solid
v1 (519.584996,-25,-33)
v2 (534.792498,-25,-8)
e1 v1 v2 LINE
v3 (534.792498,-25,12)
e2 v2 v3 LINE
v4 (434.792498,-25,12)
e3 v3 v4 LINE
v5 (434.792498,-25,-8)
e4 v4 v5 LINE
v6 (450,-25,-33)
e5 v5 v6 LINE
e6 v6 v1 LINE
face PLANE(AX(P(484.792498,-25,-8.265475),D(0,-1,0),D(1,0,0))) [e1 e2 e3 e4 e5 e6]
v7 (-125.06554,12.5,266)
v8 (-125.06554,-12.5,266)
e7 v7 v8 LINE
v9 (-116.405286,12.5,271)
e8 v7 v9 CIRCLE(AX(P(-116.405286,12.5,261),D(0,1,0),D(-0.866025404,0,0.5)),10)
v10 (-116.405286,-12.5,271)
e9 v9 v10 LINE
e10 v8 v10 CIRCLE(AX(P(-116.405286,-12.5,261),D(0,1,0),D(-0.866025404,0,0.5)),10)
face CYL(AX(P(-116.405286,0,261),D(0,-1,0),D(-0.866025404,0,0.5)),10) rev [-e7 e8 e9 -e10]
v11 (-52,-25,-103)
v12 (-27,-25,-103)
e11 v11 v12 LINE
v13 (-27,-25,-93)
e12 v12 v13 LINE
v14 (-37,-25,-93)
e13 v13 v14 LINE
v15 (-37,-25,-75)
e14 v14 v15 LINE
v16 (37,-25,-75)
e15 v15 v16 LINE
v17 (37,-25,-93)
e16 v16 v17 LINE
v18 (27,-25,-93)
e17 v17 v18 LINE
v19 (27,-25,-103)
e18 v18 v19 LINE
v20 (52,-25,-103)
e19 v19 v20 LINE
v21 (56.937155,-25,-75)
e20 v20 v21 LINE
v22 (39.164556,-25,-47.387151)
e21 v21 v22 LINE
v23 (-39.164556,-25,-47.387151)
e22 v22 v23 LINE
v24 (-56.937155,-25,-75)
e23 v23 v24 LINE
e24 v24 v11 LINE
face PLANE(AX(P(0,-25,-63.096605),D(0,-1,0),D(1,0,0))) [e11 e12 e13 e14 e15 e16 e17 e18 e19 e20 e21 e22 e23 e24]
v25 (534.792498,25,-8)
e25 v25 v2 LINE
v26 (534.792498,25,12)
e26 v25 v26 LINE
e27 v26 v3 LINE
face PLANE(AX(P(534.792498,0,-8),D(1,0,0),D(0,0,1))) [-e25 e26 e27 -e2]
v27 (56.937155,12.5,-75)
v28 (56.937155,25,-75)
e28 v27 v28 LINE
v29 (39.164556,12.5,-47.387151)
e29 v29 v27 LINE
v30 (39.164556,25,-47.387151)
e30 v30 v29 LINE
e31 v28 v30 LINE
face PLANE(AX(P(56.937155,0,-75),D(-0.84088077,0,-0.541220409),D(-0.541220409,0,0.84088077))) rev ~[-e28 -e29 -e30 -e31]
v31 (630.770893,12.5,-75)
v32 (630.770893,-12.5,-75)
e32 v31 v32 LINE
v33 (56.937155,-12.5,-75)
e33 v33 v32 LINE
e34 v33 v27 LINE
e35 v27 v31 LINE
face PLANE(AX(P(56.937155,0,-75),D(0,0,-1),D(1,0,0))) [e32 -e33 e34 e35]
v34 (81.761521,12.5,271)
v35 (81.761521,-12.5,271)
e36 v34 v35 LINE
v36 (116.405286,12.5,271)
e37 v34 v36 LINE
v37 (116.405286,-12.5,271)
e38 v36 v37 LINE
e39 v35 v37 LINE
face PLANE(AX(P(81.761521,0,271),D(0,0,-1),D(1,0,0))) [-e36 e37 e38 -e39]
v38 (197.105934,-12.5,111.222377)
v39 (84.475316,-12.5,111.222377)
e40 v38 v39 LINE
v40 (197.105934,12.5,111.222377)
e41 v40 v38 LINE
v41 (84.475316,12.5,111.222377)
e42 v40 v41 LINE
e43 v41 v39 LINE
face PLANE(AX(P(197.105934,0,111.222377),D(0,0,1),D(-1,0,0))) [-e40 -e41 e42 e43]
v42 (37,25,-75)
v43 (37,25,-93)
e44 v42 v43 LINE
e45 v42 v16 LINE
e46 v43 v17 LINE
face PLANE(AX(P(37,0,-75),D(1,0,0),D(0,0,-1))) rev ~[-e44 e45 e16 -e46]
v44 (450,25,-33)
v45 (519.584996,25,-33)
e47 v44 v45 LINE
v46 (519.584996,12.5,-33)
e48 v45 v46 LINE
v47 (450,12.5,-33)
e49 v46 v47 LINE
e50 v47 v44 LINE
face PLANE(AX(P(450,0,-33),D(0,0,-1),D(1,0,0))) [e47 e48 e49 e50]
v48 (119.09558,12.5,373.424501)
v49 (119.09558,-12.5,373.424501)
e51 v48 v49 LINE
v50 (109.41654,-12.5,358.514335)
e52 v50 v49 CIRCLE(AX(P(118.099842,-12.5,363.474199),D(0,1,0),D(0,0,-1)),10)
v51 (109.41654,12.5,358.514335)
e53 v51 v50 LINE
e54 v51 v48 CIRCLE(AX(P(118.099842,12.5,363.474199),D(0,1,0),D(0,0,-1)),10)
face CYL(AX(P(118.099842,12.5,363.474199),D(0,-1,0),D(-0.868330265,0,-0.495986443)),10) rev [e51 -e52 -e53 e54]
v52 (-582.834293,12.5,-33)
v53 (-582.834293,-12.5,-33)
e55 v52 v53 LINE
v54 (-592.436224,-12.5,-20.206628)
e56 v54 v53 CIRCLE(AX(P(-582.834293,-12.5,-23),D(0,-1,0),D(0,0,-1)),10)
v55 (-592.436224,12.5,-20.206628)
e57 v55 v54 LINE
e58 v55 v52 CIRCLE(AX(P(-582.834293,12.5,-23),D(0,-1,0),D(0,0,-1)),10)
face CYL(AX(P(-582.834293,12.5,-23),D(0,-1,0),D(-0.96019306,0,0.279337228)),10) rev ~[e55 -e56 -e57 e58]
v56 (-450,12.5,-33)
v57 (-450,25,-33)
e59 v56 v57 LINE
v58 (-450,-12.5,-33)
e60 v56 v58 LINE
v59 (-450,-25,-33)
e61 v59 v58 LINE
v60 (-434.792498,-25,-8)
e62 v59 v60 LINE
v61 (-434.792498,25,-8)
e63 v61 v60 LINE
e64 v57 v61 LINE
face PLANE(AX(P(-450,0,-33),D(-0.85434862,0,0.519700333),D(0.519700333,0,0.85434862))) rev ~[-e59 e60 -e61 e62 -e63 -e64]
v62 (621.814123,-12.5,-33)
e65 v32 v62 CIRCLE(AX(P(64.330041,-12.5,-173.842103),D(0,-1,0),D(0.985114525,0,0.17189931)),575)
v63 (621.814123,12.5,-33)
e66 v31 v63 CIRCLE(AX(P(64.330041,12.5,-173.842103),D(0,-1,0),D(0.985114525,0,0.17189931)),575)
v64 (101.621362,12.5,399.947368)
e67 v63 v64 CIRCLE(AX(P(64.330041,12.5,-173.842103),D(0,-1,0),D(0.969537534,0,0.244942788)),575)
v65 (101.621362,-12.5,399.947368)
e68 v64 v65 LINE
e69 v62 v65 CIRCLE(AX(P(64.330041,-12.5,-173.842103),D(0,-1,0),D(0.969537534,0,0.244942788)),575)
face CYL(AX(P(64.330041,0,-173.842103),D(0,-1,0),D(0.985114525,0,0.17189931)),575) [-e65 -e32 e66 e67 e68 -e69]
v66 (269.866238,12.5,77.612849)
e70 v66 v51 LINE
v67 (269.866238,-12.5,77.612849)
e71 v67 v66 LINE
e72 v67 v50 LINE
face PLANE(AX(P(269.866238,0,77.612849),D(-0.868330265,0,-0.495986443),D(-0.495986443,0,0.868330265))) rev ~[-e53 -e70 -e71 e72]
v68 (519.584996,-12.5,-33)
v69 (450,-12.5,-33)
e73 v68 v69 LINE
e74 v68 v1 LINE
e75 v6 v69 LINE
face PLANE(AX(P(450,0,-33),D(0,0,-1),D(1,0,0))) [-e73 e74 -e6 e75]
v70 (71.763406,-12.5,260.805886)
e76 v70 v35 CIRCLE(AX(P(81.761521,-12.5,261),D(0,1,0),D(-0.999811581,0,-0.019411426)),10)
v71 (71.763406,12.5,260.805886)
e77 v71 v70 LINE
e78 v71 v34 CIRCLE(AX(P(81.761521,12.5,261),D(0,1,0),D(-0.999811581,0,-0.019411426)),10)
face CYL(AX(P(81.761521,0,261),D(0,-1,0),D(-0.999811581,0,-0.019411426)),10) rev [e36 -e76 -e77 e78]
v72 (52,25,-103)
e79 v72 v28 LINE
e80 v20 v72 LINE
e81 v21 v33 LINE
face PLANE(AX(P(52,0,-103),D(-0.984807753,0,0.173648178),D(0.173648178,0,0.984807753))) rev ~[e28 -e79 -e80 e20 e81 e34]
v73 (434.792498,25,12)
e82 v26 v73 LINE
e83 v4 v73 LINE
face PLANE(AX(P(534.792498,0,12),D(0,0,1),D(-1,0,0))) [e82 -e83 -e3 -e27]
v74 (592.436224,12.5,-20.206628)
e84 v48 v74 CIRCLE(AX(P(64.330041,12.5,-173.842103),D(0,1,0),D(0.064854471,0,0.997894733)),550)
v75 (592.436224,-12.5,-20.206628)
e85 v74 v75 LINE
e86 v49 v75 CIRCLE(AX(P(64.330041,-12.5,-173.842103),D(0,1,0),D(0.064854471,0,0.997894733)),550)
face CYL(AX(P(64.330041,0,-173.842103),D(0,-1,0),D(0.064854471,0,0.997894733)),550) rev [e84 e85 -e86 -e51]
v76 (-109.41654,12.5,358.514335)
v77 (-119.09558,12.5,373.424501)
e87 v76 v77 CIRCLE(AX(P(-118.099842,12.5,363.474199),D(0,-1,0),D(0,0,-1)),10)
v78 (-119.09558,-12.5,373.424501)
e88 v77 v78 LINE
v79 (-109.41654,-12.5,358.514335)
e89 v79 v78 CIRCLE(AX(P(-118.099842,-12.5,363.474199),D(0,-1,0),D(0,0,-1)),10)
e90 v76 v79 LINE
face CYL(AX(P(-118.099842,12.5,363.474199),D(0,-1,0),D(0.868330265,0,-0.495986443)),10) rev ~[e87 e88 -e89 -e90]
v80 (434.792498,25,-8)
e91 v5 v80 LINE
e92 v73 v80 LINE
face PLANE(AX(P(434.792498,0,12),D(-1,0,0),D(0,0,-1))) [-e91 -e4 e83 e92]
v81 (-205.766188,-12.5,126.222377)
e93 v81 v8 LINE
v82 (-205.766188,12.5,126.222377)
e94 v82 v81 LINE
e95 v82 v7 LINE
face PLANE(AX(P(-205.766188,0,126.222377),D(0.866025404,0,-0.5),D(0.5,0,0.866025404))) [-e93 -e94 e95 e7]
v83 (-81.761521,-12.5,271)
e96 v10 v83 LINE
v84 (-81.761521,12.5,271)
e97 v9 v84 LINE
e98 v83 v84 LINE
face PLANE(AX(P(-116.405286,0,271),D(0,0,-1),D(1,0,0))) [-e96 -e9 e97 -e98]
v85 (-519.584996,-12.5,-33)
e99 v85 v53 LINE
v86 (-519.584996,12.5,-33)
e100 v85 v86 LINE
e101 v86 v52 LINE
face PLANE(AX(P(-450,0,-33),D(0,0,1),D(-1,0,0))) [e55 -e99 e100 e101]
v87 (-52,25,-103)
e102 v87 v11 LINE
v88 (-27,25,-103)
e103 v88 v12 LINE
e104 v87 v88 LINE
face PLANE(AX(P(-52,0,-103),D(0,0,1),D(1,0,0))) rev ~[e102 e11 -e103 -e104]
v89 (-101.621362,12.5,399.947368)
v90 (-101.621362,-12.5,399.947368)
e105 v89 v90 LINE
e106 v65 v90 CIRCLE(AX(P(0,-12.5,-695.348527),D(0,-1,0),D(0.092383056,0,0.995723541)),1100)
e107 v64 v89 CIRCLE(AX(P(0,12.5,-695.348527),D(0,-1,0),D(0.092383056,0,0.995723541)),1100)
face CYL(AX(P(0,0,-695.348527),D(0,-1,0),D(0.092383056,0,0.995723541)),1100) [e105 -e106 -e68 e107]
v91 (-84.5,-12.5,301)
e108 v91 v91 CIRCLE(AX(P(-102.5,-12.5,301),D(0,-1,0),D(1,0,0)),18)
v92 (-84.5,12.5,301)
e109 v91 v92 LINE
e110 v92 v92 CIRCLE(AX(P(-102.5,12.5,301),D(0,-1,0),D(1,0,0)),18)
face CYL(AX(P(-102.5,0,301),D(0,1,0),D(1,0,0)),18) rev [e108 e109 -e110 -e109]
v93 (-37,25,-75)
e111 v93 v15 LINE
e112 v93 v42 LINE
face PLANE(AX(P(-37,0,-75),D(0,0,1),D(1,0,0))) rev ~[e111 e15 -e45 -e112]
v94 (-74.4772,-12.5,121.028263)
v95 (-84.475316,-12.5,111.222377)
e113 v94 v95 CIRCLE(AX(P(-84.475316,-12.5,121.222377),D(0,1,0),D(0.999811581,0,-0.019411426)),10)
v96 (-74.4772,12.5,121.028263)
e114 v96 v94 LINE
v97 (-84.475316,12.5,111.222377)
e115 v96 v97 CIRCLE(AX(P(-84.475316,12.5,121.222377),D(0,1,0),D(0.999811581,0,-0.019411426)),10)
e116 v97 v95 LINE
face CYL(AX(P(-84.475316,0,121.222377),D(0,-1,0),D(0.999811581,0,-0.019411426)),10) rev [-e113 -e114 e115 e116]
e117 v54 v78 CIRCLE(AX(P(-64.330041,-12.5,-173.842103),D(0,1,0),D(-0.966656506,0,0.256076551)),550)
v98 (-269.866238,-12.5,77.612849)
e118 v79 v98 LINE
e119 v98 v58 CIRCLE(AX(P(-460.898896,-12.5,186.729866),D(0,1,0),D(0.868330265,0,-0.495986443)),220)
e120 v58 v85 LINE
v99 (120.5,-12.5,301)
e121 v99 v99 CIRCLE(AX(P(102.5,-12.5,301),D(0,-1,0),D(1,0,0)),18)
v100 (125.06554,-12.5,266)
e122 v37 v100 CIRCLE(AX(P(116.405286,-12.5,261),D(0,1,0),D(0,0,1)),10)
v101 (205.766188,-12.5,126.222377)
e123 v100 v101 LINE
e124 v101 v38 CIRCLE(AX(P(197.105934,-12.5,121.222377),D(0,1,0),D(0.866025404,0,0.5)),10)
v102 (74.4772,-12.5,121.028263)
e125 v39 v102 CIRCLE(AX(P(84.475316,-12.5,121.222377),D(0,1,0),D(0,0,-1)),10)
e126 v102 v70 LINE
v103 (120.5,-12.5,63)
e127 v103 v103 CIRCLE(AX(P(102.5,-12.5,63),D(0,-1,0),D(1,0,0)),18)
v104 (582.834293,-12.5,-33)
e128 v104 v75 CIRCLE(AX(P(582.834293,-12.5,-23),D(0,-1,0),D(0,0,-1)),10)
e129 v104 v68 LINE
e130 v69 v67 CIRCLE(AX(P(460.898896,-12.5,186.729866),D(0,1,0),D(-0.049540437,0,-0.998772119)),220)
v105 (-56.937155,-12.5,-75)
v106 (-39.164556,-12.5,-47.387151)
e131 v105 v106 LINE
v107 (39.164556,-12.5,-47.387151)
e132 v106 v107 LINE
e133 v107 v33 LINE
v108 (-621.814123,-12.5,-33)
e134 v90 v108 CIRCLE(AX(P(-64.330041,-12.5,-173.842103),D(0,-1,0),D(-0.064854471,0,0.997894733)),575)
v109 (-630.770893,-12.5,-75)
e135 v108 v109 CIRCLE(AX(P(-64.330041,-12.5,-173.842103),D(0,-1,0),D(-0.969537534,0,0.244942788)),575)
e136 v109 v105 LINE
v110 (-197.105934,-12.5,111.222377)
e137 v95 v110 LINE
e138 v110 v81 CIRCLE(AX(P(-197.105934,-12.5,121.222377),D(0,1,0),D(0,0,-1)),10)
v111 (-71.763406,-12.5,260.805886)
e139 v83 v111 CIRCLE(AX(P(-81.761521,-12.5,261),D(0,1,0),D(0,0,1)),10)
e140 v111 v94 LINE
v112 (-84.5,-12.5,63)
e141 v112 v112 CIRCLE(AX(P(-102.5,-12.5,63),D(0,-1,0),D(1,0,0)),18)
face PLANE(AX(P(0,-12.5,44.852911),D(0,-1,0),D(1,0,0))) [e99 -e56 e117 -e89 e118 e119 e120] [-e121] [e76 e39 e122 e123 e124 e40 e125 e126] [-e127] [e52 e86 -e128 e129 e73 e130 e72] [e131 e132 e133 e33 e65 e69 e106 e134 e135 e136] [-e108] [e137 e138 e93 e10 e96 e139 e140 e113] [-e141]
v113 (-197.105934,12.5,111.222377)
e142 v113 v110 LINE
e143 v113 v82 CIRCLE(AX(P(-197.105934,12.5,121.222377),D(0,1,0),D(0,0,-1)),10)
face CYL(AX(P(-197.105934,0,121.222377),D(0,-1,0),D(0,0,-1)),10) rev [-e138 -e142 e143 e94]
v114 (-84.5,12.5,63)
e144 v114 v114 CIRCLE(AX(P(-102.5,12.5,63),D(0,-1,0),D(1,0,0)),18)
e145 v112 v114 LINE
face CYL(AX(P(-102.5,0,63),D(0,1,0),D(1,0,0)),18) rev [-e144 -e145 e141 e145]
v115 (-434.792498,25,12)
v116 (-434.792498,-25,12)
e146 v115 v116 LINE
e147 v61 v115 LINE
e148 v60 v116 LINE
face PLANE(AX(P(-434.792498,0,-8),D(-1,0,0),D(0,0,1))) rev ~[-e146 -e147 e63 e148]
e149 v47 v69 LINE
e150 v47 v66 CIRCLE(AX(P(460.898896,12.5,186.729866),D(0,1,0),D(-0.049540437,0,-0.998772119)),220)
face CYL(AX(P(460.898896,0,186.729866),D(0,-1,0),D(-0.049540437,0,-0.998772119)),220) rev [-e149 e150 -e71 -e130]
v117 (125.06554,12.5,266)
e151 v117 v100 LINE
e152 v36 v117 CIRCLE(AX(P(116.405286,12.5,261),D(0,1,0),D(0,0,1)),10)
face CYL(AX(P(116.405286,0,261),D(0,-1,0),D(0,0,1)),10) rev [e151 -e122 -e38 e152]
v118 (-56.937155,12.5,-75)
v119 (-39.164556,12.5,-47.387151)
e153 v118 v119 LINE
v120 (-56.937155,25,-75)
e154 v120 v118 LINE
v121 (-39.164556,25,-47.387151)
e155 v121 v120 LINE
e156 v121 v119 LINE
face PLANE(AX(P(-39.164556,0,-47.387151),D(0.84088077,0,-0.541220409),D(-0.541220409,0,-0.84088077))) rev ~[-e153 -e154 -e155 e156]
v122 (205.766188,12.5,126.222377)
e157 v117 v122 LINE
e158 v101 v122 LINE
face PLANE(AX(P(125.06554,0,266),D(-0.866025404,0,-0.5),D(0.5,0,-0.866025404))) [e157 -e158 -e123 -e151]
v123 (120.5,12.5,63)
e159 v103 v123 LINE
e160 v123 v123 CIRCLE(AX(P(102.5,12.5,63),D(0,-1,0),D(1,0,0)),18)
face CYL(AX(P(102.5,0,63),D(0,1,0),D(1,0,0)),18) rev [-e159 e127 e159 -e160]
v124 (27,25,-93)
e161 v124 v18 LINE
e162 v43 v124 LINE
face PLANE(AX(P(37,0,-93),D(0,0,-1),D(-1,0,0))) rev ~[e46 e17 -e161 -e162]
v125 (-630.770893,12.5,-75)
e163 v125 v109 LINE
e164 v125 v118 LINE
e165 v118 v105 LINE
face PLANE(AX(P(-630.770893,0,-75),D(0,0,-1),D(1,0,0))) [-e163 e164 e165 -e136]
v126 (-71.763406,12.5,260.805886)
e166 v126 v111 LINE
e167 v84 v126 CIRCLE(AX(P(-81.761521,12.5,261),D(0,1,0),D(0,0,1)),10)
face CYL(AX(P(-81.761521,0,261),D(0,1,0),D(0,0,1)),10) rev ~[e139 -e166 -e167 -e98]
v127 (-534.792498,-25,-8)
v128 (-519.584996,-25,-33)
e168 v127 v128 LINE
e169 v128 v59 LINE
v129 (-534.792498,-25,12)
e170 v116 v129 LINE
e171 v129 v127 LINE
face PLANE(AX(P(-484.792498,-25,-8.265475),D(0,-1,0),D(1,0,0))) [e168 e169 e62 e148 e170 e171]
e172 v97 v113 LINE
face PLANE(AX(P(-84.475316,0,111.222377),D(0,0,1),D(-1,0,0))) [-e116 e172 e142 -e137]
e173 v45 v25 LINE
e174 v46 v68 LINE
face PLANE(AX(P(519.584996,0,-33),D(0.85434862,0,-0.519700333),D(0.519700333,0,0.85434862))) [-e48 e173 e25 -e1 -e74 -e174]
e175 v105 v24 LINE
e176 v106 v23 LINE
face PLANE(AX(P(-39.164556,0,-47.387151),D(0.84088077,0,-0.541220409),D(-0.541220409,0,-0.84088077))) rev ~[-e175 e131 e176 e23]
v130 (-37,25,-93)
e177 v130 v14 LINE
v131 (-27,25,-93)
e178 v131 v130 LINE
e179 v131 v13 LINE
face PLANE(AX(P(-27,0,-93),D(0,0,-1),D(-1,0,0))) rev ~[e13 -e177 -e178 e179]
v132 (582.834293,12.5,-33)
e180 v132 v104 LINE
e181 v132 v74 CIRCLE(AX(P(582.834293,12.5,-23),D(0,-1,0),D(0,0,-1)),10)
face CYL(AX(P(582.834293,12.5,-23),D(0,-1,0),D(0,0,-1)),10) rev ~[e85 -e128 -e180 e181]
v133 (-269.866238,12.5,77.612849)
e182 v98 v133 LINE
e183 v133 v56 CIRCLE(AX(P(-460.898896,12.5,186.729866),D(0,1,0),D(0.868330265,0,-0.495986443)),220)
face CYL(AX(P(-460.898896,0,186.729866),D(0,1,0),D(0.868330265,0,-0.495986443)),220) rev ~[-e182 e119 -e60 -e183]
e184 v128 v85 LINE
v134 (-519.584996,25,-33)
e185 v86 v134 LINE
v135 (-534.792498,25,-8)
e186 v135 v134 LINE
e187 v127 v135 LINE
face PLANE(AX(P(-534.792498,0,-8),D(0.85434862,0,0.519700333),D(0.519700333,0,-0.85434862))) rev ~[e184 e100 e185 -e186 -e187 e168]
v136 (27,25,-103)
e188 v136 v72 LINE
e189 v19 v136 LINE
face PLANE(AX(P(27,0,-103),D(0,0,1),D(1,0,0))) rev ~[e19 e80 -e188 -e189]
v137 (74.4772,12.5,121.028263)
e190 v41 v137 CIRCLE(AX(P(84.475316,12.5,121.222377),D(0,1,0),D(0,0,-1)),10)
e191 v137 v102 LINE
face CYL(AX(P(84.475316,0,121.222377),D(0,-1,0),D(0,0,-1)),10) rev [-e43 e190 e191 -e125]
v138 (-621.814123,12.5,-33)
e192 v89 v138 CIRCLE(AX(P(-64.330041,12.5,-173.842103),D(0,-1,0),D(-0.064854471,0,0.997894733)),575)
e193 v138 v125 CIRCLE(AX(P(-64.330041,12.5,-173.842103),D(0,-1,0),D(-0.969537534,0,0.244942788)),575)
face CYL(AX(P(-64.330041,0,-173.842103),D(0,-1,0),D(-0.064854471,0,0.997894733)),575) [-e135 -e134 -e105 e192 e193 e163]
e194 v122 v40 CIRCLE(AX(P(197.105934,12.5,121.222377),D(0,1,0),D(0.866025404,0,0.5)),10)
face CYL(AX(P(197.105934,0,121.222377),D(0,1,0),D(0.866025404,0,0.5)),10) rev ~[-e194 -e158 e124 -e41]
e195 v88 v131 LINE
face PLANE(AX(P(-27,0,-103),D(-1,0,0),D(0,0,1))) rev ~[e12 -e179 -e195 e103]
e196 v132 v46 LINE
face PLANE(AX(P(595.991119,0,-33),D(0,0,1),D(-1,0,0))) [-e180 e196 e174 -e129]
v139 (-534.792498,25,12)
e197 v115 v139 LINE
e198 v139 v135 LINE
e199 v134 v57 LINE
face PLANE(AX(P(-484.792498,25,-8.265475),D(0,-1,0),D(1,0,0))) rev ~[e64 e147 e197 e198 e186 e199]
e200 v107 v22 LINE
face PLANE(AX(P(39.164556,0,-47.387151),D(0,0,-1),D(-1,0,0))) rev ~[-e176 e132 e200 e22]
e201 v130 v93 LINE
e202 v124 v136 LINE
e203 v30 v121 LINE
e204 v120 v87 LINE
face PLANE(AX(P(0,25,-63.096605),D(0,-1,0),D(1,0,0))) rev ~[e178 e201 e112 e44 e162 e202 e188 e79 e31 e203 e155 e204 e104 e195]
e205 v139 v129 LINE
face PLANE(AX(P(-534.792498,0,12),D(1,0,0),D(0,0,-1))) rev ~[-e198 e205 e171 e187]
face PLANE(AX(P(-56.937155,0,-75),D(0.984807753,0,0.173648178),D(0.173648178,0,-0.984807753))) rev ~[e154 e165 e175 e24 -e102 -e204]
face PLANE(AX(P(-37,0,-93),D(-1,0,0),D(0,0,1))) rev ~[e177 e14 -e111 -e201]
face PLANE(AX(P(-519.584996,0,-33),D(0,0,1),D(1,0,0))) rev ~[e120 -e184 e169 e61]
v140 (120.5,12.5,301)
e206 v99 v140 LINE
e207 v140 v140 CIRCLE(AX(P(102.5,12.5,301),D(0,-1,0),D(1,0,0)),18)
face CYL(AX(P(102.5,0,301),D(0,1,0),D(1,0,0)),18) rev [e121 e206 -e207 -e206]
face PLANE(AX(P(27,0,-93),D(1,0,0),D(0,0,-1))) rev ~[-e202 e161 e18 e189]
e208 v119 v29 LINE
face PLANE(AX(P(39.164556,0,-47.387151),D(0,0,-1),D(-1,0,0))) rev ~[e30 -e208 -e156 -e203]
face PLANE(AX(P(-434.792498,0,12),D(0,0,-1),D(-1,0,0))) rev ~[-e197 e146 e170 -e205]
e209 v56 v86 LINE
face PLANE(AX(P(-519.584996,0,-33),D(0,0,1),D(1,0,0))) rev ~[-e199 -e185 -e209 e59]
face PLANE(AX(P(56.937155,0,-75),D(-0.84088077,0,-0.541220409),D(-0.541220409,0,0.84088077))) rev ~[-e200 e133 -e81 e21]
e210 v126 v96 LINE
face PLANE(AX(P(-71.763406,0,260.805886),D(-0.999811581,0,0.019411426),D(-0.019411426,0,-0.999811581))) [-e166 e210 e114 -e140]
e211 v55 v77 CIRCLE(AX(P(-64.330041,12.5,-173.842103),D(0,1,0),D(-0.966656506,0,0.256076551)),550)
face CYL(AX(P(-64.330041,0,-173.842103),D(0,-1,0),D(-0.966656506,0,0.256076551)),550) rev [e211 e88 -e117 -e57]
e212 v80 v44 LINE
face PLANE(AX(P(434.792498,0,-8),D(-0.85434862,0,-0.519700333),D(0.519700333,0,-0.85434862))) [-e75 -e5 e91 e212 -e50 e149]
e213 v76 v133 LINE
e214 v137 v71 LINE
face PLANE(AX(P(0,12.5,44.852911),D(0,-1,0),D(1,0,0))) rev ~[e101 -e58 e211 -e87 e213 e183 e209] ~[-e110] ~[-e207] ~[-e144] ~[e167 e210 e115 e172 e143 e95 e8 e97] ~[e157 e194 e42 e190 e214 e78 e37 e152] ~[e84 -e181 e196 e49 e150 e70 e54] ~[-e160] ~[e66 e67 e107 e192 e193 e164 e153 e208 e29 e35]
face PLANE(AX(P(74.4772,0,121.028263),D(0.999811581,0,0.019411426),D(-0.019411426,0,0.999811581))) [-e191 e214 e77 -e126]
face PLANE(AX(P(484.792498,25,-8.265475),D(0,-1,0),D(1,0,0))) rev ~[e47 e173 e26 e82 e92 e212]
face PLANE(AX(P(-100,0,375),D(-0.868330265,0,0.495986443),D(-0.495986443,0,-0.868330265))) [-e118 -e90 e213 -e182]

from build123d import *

# Parameters (mm, degrees)
F0_R     = 18
F1_DEPTH = 12.5
F2_R     = 10
F3_DEPTH = 25


# Not quite as in the source:
# - a feature names something its author has since deleted; it is built from what else it names


with BuildPart() as f1:
    # F0 (on Front) → F1 (new body, symmetric)
    with BuildSketch(Plane.XZ):
        with BuildLine():
            Line((56.9371554598, -75), (595.9911190147, -75))
            Line((595.9911190147, -75), (595.9911190147, -33))
            Line((595.9911190147, -33), (519.5849960263, -33))
            Line((519.5849960263, -33), (450, -33))
            ThreePointArc((450, -33), (345.7777045638, -0.7457623443), (269.8662378191, 77.6128487294))
            Line((269.8662378191, 77.6128487294), (100, 375))
            Line((100, 375), (0, 375))
            Line((0, 375), (-100, 375))
            Line((-100, 375), (-269.8662378191, 77.6128487294))
            ThreePointArc((-269.8662378191, 77.6128487294), (-345.7777045638, -0.7457623443), (-450, -33))
            Line((-450, -33), (-484.7924980132, -33))
            Line((-484.7924980132, -33), (-519.5849960263, -33))
            Line((-519.5849960263, -33), (-595.9911190147, -33))
            Line((-595.9911190147, -33), (-595.9911190147, -75))
            Line((-595.9911190147, -75), (-56.9371554598, -75))
            Line((-56.9371554598, -75), (-39.1645557923, -47.3871512706))
            Line((-39.1645557923, -47.3871512706), (3.3388429378, -47.3871512706))
            Line((3.3388429378, -47.3871512706), (39.1645557923, -47.3871512706))
            Line((39.1645557923, -47.3871512706), (56.9371554598, -75))
        make_face()
        with Locations((-102.5, 63)):
            Circle(F0_R, mode=Mode.SUBTRACT)
        with Locations((102.5, 63)):
            Circle(F0_R, mode=Mode.SUBTRACT)
        with BuildLine():
            ThreePointArc((-74.4771999255, 121.0282629209), (-77.4732139948, 114.0830094681), (-84.4753157308, 111.2223771768))
            Line((-84.4753157308, 111.2223771768), (-197.1059338565, 111.2223771768))
            ThreePointArc((-197.1059338565, 111.2223771768), (-205.7661878943, 116.2223771768), (-205.7661878943, 126.2223771768))
            Line((-205.7661878943, 126.2223771768), (-125.0655397306, 266))
            ThreePointArc((-125.0655397306, 266), (-121.4052856928, 269.6602540378), (-116.4052856928, 271))
            Line((-116.4052856928, 271), (-81.7615214746, 271))
            ThreePointArc((-81.7615214746, 271), (-74.622153766, 268.0021017359), (-71.7634056693, 260.8058857441))
            Line((-71.7634056693, 260.8058857441), (-74.4771999255, 121.0282629209))
        make_face(mode=Mode.SUBTRACT)
        with Locations((-102.5, 301)):
            Circle(F0_R, mode=Mode.SUBTRACT)
        with BuildLine():
            ThreePointArc((84.4753157308, 111.2223771768), (77.4732139948, 114.0830094681), (74.4771999255, 121.0282629209))
            Line((74.4771999255, 121.0282629209), (71.7634056693, 260.8058857441))
            ThreePointArc((71.7634056693, 260.8058857441), (74.622153766, 268.0021017359), (81.7615214746, 271))
            Line((81.7615214746, 271), (116.4052856928, 271))
            ThreePointArc((116.4052856928, 271), (121.4052856928, 269.6602540378), (125.0655397306, 266))
            Line((125.0655397306, 266), (205.7661878943, 126.2223771768))
            ThreePointArc((205.7661878943, 126.2223771768), (205.7661878943, 116.2223771768), (197.1059338565, 111.2223771768))
            Line((197.1059338565, 111.2223771768), (84.4753157308, 111.2223771768))
        make_face(mode=Mode.SUBTRACT)
        with Locations((102.5, 301)):
            Circle(F0_R, mode=Mode.SUBTRACT)
        with BuildLine():
            ThreePointArc((100, 375), (413.732568712, 250.914148912), (595.9911190147, -33))
            Line((595.9911190147, -33), (621.814123166, -33))
            ThreePointArc((621.814123166, -33), (432.1619331745, 268.1134366241), (101.6213617791, 399.9473683177))
            ThreePointArc((101.6213617791, 399.9473683177), (0, 404.6514727579), (-101.6213617791, 399.9473683177))
            ThreePointArc((-101.6213617791, 399.9473683177), (-432.1619331745, 268.1134366241), (-621.814123166, -33))
            Line((-621.814123166, -33), (-595.9911190147, -33))
            ThreePointArc((-595.9911190147, -33), (-413.732568712, 250.914148912), (-100, 375))
            Line((-100, 375), (0, 375))
            Line((0, 375), (100, 375))
        make_face()
        with BuildLine():
            Line((-595.9911190147, -75), (-595.9911190147, -33))
            Line((-595.9911190147, -33), (-621.814123166, -33))
            ThreePointArc((-621.814123166, -33), (-626.6847460238, -53.9163527136), (-630.7708927375, -75))
            Line((-630.7708927375, -75), (-595.9911190147, -75))
        make_face()
        with BuildLine():
            Line((595.9911190147, -33), (595.9911190147, -75))
            Line((595.9911190147, -75), (630.7708927375, -75))
            ThreePointArc((630.7708927375, -75), (626.6847460238, -53.9163527136), (621.814123166, -33))
            Line((621.814123166, -33), (595.9911190147, -33))
        make_face()
    extrude(amount=F1_DEPTH, both=True)

    # F2
    f2_edges = [f1.edges().sort_by_distance(p)[0] for p in [
        (-100, 0, 375),
        (100, 0, 375),
        (595.991119, 0, -33),
        (-595.991119, 0, -33),
    ]]
    fillet(f2_edges, radius=F2_R)

    # F0 (on Front) → F3 (join, symmetric)
    with BuildSketch(Plane.XZ):
        Polygon((-484.7924980132, -33), (-450, -33), (-434.7924980132, -8), (-434.7924980132, 12), (-484.7924980132, 12), (-534.7924980132, 12), (-534.7924980132, -8), (-519.5849960263, -33), align=None)
        Polygon((37, -75), (56.9371554598, -75), (39.1645557923, -47.3871512706), (3.3388429378, -47.3871512706), (-39.1645557923, -47.3871512706), (-56.9371554598, -75), (-37, -75), (0, -75), align=None)
        Polygon((52, -103), (56.9371554598, -75), (37, -75), (37, -93), (27, -93), (27, -103), align=None)
        Polygon((-37, -93), (-37, -75), (-56.9371554598, -75), (-52, -103), (-27, -103), (-27, -93), align=None)
        Polygon((450, -33), (519.5849960263, -33), (534.7924980132, -8), (534.7924980132, 12), (484.7924980132, 12), (434.7924980132, 12), (434.7924980132, -8), align=None)
    extrude(amount=F3_DEPTH, both=True)


solid = f1.part
